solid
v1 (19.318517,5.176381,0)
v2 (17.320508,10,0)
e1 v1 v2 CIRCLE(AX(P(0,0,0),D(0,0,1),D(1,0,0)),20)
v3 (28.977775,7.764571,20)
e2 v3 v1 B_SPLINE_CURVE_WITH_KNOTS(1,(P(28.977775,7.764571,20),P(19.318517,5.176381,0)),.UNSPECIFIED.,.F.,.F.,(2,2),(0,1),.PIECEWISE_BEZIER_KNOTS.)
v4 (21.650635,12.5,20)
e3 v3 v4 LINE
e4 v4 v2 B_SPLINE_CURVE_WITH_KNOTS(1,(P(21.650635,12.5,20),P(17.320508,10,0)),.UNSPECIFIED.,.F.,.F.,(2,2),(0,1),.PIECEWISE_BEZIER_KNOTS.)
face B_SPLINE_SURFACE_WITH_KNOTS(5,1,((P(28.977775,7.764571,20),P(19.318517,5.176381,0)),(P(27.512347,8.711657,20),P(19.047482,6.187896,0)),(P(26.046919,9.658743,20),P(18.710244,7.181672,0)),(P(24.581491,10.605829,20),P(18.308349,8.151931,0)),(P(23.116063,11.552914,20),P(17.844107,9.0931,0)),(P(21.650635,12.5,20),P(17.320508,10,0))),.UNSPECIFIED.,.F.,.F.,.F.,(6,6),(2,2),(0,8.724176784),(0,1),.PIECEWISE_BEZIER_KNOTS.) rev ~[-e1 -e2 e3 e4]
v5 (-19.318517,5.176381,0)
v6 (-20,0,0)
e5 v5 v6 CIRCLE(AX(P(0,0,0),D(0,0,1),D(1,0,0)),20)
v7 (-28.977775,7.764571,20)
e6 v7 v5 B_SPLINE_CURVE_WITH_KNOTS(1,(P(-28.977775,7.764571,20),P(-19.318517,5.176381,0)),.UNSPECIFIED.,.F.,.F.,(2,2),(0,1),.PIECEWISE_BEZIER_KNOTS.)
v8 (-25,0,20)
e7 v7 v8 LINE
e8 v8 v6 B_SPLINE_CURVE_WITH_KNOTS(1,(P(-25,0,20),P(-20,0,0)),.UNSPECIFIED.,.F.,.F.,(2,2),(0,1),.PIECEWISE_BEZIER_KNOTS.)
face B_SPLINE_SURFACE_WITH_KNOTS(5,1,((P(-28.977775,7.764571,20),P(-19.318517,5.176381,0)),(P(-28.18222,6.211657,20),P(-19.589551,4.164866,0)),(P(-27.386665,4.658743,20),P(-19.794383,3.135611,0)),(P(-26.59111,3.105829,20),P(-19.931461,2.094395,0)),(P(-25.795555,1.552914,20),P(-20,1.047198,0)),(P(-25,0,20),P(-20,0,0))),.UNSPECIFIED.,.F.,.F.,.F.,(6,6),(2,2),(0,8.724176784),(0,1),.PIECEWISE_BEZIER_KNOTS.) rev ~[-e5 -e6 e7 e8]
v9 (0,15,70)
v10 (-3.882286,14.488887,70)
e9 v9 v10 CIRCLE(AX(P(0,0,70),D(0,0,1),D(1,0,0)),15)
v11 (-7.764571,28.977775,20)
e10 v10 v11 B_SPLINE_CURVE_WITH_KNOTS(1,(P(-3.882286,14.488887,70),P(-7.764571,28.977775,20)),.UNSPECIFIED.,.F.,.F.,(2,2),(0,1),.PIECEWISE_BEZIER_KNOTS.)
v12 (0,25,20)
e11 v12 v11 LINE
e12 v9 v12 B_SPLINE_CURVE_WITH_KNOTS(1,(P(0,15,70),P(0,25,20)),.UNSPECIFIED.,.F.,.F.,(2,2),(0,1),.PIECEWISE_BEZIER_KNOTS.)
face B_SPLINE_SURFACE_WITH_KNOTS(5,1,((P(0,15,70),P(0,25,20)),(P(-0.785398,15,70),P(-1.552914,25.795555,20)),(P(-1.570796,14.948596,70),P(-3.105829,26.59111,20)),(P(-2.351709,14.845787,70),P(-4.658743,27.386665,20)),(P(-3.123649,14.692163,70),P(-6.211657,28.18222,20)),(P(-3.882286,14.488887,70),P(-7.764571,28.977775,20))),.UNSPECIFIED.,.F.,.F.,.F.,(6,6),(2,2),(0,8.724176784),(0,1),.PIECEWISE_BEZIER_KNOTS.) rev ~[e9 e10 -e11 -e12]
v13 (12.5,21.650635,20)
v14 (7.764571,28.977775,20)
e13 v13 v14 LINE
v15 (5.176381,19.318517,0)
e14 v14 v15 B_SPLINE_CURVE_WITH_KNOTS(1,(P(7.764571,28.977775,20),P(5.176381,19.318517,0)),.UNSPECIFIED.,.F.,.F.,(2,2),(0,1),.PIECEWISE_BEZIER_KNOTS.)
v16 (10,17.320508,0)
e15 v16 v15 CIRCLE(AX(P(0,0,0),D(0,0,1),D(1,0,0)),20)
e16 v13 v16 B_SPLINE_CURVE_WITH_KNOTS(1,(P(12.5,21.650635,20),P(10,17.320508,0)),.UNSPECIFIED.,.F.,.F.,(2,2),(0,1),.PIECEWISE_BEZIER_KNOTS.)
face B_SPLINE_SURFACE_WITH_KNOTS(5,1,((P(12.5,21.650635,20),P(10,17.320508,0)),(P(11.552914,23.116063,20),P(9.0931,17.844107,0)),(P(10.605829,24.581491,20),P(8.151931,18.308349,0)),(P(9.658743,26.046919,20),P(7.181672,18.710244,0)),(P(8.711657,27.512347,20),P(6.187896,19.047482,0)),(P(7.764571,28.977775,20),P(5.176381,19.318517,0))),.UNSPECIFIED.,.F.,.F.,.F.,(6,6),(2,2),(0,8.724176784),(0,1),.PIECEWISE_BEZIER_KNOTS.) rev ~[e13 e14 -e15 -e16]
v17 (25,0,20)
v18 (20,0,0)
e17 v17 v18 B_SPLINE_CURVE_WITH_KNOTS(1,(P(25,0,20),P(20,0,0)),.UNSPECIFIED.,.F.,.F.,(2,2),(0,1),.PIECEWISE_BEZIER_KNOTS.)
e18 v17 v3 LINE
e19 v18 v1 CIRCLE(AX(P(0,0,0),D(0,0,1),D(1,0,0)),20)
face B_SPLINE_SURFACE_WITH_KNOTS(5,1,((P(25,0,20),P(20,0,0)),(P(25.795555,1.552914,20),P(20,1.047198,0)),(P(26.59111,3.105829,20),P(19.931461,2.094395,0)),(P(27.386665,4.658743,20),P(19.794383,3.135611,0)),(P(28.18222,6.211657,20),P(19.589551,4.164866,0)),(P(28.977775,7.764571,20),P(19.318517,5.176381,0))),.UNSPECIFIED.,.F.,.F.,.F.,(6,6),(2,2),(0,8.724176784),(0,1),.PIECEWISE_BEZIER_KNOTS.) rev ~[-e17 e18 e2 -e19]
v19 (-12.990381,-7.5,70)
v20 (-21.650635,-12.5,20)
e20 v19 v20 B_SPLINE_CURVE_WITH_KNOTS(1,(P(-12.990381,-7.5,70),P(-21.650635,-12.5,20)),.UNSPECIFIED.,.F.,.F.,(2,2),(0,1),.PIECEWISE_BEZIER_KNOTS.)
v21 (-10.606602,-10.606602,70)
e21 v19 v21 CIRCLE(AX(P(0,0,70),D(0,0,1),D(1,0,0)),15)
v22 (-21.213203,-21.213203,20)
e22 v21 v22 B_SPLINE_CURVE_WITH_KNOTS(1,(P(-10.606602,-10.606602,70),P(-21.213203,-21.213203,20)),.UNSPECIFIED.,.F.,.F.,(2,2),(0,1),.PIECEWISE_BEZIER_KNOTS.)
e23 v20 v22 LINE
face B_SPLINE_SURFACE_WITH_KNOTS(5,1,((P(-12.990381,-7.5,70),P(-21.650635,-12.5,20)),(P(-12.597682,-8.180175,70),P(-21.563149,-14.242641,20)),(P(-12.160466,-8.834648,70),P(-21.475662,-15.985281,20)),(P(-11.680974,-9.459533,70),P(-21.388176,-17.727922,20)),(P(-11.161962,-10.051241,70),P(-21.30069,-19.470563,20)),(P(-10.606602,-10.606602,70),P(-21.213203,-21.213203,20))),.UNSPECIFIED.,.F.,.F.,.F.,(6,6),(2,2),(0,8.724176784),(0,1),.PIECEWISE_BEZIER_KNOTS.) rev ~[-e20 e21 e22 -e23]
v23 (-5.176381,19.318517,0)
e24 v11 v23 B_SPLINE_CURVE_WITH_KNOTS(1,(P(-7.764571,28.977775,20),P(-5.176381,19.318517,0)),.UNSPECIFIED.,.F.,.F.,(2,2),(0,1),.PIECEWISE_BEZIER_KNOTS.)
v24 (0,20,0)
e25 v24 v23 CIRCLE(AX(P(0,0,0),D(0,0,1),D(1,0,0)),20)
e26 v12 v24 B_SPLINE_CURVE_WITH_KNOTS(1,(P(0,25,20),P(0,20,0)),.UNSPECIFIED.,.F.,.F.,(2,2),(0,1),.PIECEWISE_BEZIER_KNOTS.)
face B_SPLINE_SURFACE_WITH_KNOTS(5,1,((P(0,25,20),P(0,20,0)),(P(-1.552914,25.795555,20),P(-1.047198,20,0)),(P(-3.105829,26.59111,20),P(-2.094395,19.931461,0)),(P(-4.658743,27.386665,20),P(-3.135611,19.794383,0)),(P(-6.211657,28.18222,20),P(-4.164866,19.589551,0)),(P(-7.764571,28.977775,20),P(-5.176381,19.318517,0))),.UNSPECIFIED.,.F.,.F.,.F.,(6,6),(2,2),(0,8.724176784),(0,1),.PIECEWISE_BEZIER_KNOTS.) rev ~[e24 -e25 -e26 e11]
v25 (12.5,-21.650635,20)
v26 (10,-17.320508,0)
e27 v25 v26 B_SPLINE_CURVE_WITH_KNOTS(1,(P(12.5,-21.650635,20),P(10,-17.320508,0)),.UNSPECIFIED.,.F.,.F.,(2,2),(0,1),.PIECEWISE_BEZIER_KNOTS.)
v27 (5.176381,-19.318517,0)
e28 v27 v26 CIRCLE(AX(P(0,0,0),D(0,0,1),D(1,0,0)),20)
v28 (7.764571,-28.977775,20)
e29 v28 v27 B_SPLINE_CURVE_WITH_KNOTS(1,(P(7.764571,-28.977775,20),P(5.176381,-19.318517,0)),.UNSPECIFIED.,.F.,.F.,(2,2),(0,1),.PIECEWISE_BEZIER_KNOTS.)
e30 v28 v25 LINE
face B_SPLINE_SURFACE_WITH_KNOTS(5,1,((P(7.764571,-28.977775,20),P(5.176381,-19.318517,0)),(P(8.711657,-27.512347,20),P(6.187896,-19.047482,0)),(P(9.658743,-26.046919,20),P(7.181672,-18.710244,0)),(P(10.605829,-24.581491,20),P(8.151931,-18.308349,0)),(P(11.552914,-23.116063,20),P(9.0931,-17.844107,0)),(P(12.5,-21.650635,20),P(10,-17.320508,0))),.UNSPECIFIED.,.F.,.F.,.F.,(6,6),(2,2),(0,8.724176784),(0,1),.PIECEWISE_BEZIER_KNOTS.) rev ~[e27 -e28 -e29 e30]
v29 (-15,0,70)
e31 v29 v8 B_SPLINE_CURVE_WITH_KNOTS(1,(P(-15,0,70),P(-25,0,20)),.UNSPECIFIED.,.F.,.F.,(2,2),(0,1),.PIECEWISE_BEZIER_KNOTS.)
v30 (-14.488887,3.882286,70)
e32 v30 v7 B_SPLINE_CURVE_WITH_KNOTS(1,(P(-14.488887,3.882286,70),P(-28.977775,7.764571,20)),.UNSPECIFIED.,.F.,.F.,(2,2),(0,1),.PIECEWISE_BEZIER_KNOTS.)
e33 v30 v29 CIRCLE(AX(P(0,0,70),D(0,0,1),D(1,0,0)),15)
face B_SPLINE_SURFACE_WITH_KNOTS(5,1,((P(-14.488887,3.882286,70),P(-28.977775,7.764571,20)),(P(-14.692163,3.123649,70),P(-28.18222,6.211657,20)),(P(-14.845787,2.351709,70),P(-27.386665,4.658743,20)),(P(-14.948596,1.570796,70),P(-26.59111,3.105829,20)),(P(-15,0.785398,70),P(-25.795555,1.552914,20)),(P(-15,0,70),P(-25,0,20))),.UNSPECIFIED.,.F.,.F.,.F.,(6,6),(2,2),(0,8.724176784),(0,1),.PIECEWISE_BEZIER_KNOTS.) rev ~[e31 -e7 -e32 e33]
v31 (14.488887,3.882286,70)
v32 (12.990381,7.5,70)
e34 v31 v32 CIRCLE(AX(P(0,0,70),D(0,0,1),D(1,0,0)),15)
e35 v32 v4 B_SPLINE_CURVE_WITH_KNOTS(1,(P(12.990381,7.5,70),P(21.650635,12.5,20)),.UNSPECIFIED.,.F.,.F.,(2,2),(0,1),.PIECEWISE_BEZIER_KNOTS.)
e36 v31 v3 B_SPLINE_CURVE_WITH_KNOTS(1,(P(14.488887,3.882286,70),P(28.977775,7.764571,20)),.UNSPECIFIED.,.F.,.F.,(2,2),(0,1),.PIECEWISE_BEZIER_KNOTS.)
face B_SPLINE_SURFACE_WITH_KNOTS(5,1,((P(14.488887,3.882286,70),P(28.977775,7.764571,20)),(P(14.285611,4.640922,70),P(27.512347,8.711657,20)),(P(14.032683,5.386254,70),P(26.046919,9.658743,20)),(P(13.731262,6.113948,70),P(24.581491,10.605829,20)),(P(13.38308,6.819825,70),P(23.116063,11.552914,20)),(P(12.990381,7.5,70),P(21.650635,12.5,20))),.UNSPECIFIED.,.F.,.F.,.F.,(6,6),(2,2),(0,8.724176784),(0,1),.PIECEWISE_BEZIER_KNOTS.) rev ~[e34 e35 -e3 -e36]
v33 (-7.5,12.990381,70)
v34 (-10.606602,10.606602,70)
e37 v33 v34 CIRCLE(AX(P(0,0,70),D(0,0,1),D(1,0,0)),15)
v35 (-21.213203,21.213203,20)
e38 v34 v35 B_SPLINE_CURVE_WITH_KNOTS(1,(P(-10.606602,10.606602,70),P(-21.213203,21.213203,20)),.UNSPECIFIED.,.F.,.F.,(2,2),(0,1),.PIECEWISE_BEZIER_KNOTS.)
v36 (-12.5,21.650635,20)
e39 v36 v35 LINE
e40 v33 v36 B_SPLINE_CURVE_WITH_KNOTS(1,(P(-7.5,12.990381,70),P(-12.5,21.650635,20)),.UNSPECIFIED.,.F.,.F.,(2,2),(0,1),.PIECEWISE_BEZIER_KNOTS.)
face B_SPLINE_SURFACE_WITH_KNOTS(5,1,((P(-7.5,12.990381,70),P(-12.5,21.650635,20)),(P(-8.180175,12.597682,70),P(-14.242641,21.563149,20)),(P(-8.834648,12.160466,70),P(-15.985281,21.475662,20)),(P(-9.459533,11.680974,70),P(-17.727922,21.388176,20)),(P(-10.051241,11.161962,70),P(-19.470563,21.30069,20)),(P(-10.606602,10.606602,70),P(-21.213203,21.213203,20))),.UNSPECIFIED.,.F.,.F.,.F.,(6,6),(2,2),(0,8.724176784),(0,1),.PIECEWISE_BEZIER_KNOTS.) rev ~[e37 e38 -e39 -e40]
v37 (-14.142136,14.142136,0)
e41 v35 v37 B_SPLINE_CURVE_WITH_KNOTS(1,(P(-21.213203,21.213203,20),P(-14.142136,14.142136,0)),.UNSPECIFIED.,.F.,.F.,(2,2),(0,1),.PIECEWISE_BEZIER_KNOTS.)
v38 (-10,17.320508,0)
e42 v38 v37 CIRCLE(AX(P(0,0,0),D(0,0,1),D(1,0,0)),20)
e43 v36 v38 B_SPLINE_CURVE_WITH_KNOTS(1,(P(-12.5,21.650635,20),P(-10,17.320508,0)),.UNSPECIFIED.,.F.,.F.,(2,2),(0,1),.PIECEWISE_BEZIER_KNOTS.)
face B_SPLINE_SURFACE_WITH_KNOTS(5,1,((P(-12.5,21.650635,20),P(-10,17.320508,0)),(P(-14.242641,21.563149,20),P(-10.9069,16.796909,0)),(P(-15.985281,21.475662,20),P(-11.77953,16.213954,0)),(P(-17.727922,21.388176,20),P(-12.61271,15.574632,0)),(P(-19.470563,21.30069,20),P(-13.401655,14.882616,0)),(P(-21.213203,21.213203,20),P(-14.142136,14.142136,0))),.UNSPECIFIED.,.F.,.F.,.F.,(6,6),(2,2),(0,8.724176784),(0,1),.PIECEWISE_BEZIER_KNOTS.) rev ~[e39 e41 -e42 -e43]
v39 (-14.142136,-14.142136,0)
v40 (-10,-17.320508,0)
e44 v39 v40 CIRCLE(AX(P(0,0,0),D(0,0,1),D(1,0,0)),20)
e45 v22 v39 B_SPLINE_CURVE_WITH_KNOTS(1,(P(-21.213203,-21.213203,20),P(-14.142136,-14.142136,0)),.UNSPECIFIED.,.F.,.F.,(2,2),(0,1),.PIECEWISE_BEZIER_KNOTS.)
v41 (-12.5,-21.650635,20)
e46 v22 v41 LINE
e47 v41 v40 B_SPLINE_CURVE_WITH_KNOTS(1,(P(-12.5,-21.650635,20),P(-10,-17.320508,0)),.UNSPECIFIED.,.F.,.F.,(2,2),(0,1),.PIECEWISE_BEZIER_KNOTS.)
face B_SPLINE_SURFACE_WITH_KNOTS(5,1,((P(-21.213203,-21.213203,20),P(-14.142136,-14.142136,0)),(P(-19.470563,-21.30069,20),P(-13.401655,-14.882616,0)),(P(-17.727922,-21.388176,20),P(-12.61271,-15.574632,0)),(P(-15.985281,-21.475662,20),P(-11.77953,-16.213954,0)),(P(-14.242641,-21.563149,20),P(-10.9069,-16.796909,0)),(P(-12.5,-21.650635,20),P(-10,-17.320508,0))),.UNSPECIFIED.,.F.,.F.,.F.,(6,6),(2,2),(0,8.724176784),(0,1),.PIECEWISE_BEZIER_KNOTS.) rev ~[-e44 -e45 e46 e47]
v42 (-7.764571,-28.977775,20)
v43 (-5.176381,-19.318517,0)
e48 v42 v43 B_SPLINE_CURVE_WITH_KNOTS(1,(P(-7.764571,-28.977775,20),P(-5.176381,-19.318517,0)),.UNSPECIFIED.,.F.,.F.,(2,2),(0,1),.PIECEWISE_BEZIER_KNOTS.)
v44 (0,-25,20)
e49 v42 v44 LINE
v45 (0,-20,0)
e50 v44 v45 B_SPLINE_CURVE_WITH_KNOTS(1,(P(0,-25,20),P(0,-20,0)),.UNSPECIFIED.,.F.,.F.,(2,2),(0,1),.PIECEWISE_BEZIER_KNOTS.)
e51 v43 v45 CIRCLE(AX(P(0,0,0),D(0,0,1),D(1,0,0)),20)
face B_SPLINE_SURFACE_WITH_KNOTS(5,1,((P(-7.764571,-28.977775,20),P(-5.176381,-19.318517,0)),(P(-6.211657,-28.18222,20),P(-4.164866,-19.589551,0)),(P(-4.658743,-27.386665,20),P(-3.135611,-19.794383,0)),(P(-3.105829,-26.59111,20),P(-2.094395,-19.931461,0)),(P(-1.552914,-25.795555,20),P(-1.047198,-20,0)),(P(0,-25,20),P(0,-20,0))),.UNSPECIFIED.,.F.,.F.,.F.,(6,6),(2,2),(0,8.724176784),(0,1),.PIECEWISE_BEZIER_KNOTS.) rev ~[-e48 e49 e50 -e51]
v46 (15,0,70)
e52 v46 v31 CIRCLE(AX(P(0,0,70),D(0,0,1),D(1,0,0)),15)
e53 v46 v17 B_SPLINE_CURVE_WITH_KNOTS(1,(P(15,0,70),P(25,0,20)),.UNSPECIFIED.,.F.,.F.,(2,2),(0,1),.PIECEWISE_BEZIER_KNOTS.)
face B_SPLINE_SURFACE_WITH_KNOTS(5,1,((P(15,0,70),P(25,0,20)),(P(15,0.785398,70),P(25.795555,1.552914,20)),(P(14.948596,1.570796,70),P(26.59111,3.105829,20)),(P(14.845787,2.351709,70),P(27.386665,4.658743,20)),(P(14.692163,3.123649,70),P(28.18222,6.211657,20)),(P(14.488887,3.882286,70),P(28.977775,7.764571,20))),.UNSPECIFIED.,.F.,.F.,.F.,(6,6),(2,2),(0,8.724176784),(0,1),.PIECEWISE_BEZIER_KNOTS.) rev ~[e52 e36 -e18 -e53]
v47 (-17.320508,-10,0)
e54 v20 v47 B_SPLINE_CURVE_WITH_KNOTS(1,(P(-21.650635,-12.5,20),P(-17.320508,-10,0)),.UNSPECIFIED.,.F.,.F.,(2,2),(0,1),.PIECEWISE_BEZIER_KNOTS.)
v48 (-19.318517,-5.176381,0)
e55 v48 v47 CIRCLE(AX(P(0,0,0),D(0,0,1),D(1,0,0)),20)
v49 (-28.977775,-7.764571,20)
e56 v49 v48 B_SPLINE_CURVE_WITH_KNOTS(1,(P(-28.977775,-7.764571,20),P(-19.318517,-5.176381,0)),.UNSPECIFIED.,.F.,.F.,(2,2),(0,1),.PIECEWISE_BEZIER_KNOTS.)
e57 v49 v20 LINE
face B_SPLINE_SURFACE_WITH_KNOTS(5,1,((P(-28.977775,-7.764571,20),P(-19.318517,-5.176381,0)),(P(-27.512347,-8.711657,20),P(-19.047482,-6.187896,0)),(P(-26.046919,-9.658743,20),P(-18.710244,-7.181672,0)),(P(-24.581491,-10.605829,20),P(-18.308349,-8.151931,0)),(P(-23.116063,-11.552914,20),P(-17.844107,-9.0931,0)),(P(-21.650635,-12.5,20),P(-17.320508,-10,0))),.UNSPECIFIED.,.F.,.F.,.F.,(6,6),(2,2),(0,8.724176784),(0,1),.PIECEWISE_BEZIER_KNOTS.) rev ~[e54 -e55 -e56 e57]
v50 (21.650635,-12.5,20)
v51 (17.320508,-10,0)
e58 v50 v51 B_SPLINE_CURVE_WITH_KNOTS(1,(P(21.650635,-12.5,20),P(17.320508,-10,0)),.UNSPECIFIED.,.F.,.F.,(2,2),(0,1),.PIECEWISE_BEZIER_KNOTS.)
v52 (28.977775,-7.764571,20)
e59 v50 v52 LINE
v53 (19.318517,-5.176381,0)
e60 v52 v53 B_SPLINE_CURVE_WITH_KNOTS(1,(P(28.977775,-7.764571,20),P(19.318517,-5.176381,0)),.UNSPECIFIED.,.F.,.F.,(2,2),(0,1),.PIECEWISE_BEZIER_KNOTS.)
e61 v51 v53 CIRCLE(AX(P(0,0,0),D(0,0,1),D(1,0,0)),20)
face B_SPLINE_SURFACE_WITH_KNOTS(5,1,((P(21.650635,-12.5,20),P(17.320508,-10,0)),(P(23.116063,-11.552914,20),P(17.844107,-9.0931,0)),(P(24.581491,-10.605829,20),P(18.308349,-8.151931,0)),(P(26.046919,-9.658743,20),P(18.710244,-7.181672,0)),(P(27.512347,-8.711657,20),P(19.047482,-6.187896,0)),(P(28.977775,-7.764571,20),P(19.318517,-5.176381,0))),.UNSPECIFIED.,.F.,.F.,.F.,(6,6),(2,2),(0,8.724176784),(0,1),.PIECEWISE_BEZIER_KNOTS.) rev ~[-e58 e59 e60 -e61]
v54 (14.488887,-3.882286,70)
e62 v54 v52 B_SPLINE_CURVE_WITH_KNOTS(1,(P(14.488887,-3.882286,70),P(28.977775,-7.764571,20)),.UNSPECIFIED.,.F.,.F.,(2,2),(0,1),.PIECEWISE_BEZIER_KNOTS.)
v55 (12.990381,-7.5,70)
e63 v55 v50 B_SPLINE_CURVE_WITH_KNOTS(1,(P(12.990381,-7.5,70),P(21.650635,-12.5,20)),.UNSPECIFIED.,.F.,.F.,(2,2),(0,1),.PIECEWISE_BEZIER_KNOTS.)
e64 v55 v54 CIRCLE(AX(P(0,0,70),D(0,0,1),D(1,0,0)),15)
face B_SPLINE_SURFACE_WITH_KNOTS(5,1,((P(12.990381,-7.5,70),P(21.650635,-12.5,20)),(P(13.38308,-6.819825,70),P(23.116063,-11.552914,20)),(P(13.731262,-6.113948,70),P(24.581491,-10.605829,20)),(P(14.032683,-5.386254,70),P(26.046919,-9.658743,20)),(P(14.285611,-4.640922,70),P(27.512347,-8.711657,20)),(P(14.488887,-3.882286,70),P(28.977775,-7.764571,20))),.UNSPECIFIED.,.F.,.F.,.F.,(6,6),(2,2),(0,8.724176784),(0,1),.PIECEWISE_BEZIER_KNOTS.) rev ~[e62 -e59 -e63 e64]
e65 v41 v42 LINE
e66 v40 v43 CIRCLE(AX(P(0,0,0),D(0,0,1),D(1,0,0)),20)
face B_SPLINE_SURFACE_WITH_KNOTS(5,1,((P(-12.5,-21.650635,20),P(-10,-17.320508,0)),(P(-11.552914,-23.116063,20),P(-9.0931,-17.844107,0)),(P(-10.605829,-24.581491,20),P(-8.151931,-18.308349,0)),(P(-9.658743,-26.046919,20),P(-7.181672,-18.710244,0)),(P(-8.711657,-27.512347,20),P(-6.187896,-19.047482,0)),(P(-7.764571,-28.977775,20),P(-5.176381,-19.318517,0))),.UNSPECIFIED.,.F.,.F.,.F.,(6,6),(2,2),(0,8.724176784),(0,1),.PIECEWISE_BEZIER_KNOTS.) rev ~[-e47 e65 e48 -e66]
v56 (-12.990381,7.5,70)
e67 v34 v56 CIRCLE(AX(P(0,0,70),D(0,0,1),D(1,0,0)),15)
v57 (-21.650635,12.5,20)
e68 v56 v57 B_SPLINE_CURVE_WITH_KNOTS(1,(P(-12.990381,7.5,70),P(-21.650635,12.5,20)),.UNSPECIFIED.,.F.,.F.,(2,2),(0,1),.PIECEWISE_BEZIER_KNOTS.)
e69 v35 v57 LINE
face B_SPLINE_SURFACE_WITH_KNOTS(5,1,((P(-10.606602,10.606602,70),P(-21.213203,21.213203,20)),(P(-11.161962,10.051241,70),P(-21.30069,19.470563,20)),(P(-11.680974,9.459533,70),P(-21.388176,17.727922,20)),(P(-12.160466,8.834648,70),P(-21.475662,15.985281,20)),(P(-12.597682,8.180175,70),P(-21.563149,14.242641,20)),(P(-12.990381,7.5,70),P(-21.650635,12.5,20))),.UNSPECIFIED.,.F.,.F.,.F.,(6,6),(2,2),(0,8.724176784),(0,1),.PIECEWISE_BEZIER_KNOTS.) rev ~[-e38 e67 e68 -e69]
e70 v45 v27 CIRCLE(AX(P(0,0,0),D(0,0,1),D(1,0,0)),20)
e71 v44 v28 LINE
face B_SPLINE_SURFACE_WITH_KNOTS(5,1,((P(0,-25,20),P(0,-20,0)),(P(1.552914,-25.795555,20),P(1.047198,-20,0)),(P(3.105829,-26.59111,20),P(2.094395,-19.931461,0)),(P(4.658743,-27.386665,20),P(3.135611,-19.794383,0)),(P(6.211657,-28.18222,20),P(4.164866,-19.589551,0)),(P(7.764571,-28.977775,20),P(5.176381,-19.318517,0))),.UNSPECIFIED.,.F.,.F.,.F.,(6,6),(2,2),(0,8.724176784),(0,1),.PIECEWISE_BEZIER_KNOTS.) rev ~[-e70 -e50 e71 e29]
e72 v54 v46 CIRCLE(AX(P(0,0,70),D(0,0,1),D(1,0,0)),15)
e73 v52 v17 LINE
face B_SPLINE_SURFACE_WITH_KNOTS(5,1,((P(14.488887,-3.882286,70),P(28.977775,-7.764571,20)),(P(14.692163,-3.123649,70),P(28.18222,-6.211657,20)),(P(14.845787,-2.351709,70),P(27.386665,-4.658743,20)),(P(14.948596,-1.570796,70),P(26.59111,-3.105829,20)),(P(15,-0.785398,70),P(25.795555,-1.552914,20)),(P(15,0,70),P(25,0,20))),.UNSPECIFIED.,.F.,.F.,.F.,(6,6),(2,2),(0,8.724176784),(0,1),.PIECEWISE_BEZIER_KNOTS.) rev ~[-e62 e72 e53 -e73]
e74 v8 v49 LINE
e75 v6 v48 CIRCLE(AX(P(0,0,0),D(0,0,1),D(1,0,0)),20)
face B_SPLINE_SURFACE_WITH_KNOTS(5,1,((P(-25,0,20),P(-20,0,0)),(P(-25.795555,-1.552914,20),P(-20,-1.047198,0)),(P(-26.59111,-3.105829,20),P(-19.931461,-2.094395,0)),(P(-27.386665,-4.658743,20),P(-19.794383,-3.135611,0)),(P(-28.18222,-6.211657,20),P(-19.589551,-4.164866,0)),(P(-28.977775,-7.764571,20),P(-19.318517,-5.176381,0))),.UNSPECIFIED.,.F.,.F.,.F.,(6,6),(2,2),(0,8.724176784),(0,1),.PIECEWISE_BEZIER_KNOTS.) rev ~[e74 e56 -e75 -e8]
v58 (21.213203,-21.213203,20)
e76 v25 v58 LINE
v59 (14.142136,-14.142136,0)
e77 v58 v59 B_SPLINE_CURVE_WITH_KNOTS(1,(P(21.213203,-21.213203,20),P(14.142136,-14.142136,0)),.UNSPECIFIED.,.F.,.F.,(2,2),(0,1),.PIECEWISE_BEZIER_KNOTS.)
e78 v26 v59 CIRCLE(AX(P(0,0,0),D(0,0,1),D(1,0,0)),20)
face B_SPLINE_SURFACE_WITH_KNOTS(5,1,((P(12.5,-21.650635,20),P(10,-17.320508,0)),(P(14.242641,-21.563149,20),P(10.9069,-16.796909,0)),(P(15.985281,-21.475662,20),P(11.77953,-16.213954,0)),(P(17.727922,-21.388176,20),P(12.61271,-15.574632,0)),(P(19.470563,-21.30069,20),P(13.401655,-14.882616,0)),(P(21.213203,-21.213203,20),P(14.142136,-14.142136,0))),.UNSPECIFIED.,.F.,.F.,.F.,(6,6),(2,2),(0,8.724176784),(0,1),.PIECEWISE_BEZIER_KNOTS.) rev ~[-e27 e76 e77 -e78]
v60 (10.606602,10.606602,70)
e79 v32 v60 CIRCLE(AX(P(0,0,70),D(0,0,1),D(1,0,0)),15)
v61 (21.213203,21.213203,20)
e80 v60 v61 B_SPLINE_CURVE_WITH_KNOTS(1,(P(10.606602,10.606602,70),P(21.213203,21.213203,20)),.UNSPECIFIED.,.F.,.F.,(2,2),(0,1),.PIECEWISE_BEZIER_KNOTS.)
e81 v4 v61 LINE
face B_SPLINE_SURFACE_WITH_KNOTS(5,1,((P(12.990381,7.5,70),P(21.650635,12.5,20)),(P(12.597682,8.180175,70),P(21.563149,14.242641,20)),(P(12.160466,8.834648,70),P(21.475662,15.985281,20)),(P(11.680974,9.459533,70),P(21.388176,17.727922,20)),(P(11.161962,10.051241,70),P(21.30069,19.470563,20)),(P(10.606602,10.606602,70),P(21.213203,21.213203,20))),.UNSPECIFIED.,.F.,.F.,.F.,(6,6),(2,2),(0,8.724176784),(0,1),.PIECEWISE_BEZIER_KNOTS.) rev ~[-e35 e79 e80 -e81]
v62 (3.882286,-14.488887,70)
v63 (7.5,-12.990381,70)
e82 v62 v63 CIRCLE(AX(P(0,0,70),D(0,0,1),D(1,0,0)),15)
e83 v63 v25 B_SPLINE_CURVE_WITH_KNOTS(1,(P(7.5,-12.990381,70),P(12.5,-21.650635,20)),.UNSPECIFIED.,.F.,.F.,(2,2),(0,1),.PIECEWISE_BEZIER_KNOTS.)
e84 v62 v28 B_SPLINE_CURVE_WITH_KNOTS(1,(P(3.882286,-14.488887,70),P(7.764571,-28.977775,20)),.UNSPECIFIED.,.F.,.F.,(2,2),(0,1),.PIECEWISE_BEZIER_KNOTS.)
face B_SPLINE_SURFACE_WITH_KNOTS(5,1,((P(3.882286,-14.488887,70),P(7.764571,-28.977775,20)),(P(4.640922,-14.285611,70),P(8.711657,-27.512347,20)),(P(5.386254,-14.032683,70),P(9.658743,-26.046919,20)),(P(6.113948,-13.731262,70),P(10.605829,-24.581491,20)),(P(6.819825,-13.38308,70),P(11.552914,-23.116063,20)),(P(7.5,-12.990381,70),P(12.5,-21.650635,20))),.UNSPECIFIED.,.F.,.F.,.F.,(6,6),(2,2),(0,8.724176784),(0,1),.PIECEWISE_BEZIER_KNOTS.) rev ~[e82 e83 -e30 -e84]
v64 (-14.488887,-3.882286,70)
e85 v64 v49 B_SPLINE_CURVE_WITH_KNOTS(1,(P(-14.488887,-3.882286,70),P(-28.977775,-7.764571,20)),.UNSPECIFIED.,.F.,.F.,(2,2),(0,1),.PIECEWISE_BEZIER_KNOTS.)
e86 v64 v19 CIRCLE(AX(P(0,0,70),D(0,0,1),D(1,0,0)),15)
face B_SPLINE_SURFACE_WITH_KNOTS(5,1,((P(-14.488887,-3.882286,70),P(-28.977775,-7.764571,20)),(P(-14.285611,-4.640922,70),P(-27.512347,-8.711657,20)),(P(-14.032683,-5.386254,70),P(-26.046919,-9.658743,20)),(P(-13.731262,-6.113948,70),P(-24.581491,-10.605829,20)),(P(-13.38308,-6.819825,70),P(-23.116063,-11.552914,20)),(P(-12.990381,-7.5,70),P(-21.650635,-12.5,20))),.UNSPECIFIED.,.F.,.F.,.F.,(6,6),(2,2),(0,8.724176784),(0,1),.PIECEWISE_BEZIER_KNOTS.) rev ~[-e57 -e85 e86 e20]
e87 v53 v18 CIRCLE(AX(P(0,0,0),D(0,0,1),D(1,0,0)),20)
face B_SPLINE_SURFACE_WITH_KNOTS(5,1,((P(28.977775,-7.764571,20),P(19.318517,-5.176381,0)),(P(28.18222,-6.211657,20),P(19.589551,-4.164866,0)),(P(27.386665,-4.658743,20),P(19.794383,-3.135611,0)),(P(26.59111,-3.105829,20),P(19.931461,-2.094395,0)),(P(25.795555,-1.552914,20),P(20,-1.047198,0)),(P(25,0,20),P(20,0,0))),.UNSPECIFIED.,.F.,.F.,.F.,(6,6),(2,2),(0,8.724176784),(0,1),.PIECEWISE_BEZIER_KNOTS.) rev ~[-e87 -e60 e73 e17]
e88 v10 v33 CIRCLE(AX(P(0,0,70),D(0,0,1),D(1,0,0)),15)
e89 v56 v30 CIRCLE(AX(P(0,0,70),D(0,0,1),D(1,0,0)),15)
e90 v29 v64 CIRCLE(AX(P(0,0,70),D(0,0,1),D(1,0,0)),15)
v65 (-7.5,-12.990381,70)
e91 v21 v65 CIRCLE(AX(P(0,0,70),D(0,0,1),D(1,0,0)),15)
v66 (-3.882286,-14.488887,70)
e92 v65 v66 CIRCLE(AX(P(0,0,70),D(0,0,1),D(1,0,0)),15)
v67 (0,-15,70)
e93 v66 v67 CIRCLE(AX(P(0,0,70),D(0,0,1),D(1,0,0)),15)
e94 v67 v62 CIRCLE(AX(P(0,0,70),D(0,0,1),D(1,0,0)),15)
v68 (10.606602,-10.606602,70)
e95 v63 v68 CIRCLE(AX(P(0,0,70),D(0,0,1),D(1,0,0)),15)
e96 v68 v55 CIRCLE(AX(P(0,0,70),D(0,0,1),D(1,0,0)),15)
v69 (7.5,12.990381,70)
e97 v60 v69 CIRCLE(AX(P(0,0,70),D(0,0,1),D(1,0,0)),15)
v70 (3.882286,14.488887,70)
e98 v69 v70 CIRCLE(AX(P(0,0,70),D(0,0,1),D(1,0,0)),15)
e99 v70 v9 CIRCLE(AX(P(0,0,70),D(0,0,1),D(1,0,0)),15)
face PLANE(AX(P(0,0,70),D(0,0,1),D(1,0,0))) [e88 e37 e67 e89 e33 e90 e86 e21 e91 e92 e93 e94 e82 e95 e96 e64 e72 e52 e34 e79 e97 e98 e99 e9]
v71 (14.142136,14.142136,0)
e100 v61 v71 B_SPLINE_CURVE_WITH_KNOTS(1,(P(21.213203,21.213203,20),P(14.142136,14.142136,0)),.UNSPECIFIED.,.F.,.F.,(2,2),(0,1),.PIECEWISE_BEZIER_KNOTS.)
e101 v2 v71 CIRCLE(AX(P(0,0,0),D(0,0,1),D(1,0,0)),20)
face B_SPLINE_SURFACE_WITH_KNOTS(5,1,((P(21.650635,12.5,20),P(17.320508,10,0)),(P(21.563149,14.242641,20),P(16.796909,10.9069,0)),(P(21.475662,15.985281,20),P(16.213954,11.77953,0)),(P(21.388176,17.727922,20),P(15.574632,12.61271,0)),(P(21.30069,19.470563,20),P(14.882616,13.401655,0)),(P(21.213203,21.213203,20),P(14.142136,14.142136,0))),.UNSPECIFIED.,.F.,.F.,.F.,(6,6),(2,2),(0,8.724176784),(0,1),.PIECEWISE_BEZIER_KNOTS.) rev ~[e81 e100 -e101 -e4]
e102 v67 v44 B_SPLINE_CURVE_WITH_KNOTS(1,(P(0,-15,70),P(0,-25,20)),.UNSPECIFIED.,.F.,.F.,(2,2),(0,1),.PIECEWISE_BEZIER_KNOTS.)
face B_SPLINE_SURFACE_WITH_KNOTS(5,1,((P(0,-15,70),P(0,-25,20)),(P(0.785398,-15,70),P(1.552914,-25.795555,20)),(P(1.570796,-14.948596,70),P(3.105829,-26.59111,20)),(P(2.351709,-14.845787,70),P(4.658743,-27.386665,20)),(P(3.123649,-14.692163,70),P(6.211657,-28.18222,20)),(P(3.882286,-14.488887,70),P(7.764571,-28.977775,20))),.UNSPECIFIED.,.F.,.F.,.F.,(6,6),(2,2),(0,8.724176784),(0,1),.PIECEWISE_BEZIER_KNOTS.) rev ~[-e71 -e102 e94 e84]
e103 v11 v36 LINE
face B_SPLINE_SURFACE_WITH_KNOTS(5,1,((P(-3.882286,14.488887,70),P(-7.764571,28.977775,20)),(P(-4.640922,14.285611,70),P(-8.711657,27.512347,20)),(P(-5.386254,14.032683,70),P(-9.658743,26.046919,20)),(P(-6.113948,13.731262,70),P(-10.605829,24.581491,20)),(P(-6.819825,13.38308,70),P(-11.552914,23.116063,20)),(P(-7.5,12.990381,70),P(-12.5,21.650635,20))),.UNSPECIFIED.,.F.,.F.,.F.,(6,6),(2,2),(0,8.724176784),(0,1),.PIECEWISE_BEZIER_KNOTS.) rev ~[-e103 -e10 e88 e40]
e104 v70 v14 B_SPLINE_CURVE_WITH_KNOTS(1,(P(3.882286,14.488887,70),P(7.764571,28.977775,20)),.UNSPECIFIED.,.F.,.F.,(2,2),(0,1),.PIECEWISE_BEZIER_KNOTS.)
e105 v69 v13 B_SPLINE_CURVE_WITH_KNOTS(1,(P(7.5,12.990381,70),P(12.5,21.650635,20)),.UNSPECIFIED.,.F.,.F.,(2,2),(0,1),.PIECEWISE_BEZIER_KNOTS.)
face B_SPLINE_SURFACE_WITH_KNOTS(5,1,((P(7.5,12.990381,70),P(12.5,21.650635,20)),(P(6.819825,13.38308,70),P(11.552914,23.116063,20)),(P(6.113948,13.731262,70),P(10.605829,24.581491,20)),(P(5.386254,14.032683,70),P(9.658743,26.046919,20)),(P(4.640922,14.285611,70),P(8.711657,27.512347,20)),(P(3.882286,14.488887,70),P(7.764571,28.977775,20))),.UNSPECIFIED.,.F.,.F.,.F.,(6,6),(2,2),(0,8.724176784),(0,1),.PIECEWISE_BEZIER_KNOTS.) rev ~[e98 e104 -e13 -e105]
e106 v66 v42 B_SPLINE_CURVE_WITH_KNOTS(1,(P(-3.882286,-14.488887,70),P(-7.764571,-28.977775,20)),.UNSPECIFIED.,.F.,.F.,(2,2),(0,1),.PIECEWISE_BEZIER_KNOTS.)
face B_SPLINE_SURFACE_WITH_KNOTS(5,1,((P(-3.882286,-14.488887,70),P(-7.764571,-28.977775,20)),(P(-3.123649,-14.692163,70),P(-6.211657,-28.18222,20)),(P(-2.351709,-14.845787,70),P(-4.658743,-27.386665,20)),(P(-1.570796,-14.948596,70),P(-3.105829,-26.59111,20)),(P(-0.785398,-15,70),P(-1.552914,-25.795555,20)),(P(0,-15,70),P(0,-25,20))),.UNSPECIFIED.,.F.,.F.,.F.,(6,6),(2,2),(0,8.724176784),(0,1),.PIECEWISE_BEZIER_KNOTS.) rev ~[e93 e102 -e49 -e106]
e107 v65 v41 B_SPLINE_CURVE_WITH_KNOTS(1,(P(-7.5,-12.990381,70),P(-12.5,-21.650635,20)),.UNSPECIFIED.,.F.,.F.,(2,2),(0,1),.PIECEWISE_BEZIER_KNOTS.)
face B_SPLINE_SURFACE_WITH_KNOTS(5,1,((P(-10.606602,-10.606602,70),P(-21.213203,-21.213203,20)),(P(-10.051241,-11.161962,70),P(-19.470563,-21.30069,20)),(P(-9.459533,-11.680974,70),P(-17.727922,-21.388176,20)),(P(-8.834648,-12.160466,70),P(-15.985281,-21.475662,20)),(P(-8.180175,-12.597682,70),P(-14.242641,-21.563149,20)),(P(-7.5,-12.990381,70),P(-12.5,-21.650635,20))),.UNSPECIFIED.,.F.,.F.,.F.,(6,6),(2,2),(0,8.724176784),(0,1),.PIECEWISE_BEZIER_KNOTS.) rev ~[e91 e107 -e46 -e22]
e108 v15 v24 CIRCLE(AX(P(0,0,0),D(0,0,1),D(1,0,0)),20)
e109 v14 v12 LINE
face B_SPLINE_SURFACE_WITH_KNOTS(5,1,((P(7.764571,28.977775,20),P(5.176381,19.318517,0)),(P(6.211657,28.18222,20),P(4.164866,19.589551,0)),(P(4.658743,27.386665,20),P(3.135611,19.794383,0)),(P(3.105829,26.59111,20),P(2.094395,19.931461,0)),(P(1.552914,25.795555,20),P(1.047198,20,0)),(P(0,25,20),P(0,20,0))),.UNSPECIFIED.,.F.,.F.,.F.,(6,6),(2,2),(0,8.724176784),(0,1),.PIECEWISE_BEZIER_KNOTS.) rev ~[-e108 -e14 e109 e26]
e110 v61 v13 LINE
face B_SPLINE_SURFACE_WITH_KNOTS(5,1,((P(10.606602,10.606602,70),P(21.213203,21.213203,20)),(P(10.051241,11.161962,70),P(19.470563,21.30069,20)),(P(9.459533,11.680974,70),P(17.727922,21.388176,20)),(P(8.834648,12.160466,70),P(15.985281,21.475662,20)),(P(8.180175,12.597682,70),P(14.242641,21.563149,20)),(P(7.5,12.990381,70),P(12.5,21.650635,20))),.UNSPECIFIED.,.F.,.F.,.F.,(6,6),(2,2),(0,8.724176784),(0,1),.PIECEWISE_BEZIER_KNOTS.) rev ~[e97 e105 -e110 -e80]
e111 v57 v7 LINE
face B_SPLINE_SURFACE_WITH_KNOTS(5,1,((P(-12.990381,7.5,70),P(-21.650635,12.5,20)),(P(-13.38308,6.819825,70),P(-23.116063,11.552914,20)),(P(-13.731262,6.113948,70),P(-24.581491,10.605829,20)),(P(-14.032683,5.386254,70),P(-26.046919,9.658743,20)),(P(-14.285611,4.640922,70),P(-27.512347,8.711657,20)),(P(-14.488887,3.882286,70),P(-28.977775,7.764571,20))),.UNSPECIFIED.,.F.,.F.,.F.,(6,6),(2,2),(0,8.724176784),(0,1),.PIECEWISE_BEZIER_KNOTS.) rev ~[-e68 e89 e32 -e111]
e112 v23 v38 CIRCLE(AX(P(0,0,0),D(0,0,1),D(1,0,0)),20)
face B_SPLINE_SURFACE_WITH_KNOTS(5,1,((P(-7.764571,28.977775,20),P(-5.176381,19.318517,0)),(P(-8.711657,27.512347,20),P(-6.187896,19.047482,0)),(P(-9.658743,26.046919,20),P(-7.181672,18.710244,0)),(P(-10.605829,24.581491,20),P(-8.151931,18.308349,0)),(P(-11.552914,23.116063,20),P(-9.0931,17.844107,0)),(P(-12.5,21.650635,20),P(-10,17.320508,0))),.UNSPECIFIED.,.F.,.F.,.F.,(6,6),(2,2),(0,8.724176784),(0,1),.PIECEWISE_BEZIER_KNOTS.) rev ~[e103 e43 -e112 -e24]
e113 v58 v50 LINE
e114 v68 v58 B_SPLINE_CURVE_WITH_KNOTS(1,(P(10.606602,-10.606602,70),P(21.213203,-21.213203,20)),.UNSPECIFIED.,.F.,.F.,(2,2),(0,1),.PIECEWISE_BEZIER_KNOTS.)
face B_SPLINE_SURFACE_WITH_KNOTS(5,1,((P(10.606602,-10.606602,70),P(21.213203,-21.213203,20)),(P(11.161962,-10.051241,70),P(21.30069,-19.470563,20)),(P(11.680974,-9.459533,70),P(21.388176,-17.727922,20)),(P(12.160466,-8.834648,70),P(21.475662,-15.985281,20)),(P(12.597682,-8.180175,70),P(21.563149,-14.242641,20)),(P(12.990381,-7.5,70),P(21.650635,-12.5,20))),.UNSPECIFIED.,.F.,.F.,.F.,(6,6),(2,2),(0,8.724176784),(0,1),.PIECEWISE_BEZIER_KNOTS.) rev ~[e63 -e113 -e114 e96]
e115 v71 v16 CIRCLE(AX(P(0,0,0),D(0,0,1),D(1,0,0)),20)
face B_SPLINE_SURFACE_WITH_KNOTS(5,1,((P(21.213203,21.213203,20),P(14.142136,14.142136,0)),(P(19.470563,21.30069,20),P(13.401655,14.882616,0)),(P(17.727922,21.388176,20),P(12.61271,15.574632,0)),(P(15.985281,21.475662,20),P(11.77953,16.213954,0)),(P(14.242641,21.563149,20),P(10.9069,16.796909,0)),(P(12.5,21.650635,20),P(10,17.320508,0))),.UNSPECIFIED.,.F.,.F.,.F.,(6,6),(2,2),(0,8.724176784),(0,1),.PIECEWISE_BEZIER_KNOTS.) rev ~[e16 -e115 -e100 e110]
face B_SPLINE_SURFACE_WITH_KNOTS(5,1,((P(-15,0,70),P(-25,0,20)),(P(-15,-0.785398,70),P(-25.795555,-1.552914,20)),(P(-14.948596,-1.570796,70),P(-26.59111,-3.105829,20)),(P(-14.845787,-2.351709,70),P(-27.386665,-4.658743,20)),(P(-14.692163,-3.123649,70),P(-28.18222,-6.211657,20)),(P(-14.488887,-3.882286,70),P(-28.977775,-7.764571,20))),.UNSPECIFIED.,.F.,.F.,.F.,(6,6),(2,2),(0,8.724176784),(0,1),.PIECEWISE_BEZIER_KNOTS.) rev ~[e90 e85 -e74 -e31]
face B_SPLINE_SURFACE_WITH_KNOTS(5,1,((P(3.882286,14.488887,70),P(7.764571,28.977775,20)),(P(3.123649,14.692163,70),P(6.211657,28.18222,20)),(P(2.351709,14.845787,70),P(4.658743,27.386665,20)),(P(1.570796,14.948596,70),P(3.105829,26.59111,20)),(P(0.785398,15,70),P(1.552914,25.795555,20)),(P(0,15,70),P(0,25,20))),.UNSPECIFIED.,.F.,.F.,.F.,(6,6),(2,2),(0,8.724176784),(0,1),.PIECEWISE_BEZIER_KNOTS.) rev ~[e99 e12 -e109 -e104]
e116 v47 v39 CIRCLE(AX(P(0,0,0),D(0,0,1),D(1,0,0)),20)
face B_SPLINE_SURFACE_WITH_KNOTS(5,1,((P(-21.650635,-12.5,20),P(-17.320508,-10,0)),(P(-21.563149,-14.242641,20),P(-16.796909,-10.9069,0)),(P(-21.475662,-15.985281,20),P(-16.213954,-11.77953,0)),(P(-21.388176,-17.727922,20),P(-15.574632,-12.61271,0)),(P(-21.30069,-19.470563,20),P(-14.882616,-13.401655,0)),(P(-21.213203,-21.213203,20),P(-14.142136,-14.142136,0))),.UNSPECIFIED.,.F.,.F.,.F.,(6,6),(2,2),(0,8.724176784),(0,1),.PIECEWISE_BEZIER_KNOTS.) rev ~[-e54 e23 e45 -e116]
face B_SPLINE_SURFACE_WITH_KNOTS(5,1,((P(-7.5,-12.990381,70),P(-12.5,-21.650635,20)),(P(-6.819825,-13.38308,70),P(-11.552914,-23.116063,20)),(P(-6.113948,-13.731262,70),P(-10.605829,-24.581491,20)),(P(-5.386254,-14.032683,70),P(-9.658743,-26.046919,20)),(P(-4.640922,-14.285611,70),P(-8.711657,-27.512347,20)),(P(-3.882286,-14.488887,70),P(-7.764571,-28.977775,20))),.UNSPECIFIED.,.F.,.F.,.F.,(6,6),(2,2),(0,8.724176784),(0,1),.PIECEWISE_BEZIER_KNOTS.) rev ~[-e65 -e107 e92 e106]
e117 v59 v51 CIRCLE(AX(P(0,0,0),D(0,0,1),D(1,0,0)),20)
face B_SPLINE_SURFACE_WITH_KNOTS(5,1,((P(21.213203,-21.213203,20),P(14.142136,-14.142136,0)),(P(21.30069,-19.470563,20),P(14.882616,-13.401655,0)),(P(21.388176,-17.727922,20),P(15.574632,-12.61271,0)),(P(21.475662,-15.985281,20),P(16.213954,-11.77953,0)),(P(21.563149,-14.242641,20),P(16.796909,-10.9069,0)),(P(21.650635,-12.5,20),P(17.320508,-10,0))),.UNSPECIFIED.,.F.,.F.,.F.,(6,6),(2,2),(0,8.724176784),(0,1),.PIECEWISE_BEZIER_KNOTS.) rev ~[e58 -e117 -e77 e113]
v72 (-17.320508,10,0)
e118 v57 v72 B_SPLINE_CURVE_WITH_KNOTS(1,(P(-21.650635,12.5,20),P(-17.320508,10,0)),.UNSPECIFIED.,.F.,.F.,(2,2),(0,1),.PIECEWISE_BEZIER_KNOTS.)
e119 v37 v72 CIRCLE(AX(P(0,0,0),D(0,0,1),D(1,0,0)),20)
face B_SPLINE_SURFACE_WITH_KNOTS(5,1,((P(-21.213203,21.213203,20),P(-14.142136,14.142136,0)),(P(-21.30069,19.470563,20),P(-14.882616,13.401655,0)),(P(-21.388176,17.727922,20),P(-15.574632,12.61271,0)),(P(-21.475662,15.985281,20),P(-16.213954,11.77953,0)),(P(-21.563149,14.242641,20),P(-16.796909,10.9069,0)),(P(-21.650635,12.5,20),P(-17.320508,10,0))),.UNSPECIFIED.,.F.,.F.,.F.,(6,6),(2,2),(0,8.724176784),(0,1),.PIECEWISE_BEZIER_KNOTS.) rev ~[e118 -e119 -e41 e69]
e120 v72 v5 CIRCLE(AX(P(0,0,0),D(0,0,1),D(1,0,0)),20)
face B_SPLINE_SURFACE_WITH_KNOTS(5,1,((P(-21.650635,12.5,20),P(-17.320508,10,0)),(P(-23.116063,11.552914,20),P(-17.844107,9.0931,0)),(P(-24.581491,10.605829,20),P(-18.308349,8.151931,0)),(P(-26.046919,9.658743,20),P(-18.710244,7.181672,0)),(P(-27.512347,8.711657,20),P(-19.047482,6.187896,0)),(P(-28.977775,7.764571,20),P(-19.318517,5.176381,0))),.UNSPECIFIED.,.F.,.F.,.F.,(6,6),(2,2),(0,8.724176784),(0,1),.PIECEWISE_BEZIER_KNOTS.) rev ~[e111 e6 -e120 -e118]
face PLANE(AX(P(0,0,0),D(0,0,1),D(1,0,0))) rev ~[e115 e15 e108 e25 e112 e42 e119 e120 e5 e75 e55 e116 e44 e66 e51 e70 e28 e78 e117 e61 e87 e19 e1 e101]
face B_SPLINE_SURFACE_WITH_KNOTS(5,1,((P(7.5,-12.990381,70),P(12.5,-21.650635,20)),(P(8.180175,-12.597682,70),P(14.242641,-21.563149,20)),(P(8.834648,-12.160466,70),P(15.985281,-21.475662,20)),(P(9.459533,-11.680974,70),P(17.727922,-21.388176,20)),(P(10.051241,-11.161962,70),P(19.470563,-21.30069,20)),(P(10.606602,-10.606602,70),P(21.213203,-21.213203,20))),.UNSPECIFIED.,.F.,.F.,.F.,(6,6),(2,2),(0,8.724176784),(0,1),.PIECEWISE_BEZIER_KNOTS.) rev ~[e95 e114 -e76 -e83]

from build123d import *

# Parameters (mm, degrees)
F0_R = 20
F5_R = 15


# Not quite as in the source:
# - a feature of the source that left no trace in its solid (it failed there, or was rolled back) is left out


with BuildPart() as f3:
    # F2 (on offset) → F3 section 0
    with BuildSketch(Plane.XY.offset(20)):
        Polygon((12.5, 21.6506350946), (7.7645713531, 28.9777747887), (0, 25), (-7.7645713531, 28.9777747887), (-12.5, 21.6506350946), (-21.2132034356, 21.2132034356), (-21.6506350946, 12.5), (-28.9777747887, 7.7645713531), (-25, 0), (-28.9777747887, -7.7645713531), (-21.6506350946, -12.5), (-21.2132034356, -21.2132034356), (-12.5, -21.6506350946), (-7.7645713531, -28.9777747887), (0, -25), (7.7645713531, -28.9777747887), (12.5, -21.6506350946), (21.2132034356, -21.2132034356), (21.6506350946, -12.5), (28.9777747887, -7.7645713531), (25, 0), (28.9777747887, 7.7645713531), (21.6506350946, 12.5), (21.2132034356, 21.2132034356), align=None)
    # F0 (on Top) → F3 section 1
    with BuildSketch(Plane.XY):
        Circle(F0_R)
    loft()

    # F5 (on offset) → F6 section 0
    with BuildSketch(Plane.XY.offset(70)):
        Circle(F5_R)
    # F3_face (on face) → F6 section 1
    with BuildSketch(Plane.XY.offset(20)):
        Polygon((12.5, 21.6506350946), (7.7645713531, 28.9777747887), (0, 25), (-7.7645713531, 28.9777747887), (-12.5, 21.6506350946), (-21.2132034356, 21.2132034356), (-21.6506350946, 12.5), (-28.9777747887, 7.7645713531), (-25, 0), (-28.9777747887, -7.7645713531), (-21.6506350946, -12.5), (-21.2132034356, -21.2132034356), (-12.5, -21.6506350946), (-7.7645713531, -28.9777747887), (0, -25), (7.7645713531, -28.9777747887), (12.5, -21.6506350946), (21.2132034356, -21.2132034356), (21.6506350946, -12.5), (28.9777747887, -7.7645713531), (25, 0), (28.9777747887, 7.7645713531), (21.6506350946, 12.5), (21.2132034356, 21.2132034356), align=None)
    loft()


solid = f3.part
